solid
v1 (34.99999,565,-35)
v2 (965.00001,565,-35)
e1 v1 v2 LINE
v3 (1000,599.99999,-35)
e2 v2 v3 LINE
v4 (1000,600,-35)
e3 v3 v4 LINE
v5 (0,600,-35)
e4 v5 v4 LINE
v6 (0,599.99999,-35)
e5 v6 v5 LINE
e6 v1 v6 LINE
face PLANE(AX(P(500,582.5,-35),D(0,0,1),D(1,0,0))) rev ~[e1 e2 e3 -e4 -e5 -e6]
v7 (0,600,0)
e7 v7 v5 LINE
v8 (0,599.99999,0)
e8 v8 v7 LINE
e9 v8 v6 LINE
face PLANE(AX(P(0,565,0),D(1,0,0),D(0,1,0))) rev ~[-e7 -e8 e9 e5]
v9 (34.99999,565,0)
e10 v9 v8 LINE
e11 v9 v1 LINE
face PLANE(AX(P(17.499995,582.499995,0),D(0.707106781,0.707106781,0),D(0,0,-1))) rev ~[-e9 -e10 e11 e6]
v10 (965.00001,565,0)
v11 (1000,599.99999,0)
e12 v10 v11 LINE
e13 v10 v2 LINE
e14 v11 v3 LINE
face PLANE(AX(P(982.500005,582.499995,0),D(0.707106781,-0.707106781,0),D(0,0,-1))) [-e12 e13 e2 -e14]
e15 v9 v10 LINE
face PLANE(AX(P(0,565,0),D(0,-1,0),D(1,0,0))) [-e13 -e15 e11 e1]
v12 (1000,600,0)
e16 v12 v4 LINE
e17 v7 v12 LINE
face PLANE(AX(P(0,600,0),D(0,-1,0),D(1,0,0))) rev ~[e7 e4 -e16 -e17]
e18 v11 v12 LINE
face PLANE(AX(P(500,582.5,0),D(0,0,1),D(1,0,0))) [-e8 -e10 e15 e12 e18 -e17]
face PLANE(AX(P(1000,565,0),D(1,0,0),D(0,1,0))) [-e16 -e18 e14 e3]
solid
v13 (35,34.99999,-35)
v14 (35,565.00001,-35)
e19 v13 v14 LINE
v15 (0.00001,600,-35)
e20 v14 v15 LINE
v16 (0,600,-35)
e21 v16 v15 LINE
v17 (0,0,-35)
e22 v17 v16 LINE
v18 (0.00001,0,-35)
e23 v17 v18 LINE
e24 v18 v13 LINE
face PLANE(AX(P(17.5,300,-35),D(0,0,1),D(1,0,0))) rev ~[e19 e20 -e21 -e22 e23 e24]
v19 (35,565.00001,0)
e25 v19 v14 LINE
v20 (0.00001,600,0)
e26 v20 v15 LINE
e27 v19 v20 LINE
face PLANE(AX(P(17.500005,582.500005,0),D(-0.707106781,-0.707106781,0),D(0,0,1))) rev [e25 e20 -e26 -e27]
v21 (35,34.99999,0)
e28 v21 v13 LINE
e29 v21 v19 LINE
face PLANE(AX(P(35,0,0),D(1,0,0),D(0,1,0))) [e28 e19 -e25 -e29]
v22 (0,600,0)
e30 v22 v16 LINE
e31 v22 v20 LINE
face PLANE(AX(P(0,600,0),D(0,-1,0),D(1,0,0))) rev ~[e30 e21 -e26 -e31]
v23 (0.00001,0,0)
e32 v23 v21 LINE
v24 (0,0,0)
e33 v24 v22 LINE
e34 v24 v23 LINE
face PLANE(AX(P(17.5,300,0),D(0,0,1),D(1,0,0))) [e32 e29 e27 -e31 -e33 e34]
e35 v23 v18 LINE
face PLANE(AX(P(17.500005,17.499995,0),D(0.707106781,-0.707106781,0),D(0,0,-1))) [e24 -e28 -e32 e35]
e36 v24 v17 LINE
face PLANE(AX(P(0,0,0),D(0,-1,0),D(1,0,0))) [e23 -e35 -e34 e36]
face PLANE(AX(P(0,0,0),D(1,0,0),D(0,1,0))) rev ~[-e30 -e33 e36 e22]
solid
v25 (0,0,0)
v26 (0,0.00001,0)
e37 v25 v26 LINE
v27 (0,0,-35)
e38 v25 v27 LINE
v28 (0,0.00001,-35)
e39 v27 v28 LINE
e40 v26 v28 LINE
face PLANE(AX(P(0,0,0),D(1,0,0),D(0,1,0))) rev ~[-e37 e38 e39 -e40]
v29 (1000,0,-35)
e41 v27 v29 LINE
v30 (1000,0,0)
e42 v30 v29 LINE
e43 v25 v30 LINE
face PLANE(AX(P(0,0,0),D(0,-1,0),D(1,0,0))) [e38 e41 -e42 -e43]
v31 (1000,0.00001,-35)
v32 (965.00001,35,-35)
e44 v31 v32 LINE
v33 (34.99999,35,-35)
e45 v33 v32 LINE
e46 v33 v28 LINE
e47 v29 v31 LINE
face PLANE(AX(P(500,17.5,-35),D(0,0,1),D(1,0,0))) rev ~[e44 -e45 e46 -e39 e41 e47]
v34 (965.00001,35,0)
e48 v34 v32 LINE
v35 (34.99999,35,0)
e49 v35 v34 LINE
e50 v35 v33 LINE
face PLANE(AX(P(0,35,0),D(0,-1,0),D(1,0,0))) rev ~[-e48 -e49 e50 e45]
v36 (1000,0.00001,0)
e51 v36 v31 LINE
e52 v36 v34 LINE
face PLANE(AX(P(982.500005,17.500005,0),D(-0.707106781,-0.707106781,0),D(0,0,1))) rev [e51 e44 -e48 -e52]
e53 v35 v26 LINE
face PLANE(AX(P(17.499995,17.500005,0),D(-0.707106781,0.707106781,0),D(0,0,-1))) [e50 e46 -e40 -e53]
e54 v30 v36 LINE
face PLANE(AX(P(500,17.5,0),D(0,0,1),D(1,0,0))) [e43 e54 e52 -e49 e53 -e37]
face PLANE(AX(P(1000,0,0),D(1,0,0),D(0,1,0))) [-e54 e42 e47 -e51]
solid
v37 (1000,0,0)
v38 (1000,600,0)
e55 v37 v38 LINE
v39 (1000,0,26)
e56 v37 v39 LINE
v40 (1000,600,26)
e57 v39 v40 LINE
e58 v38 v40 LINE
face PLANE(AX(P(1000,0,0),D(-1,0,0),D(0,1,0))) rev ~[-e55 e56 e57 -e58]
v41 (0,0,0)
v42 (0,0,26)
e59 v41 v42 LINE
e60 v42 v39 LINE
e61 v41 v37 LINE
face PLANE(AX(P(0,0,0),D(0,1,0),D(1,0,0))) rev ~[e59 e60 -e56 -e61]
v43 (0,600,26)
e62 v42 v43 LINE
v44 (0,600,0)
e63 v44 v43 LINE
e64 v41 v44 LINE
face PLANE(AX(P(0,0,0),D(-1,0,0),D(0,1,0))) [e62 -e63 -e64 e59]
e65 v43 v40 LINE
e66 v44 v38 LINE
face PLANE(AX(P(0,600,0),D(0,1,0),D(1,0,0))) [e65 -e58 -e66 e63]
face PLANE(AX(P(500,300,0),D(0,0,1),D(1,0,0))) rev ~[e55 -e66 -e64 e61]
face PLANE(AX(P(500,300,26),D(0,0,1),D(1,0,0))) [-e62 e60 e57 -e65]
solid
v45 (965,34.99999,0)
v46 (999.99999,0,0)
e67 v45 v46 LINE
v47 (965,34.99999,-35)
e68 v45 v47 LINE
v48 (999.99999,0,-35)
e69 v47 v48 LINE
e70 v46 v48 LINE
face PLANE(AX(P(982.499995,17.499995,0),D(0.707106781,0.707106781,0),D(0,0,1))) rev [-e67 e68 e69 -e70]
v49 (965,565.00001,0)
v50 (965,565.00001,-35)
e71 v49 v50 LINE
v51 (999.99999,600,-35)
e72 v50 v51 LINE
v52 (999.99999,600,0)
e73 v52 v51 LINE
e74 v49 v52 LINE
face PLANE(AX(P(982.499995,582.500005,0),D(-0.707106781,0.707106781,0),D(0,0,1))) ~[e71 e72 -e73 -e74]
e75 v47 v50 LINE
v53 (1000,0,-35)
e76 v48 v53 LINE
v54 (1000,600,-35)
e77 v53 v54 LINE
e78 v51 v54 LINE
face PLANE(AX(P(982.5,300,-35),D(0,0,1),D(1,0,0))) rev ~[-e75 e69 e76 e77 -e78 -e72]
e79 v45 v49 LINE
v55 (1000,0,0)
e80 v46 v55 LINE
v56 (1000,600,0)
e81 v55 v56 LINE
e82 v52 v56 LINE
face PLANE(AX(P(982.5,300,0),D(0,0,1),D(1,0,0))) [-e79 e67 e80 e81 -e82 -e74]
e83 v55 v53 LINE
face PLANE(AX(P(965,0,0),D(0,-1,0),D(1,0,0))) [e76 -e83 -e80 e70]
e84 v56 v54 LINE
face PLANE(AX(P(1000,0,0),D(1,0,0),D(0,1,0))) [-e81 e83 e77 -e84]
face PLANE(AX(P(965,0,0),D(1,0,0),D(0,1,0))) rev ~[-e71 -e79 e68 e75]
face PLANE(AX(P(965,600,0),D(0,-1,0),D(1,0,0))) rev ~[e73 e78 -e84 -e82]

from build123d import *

# Parameters (mm, degrees)
F3_W       = 1000
F3_H       = 35
F7_DEPTH   = 35
F6_W       = 1000
F6_H       = 35
F8_DEPTH   = 35
F4_W       = 35
F4_H       = 600
F9_DEPTH   = 35
F5_W       = 35
F5_H       = 600
F10_DEPTH  = 35
F11_SIZE   = 34.99999
F12_SIZE   = 34.99999
F13_SIZE   = 34.99999
F14_SIZE   = 34.99999
F15_SIZE   = 34.99999
F15_2_SIZE = 34.99999
F16_SIZE   = 34.99999
F16_2_SIZE = 34.99999
F2_W       = 1000
F2_H       = 600
F17_DEPTH  = 26


# Not quite as in the source:
# - a fillet or chamfer is up to 0.001 mm smaller than in the source, because OpenCascade refuses the exact size


with BuildPart() as f7:
    # F3 (on Top) → F7 (new body)
    with BuildSketch(Plane.XY):
        with Locations((500, 17.5)):
            Rectangle(F3_W, F3_H)
    extrude(amount=-F7_DEPTH)

    # F14 (size 35 in the source; OpenCascade refuses exactly that, so slightly less here)
    f14_edges = [f7.edges().sort_by_distance(p)[0] for p in [
        (1000, 35, -17.5),
    ]]
    chamfer(f14_edges, length=F14_SIZE)

    # F15 (size 35 in the source; OpenCascade refuses exactly that, so slightly less here)
    f15_edges = [f7.edges().sort_by_distance(p)[0] for p in [
        (0, 35, -17.5),
    ]]
    chamfer(f15_edges, length=F15_SIZE)


with BuildPart() as f8:
    # F6 (on Top) → F8 (new body)
    with BuildSketch(Plane.XY):
        with Locations((500, 582.5)):
            Rectangle(F6_W, F6_H)
    extrude(amount=-F8_DEPTH)

    # F12 (size 35 in the source; OpenCascade refuses exactly that, so slightly less here)
    f12_edges = [f8.edges().sort_by_distance(p)[0] for p in [
        (1000, 565, -17.5),
    ]]
    chamfer(f12_edges, length=F12_SIZE)

    # F16#2 (size 35 in the source; OpenCascade refuses exactly that, so slightly less here)
    f16_2_edges = [f8.edges().sort_by_distance(p)[0] for p in [
        (0, 565, -17.5),
    ]]
    chamfer(f16_2_edges, length=F16_2_SIZE)


with BuildPart() as f9:
    # F4 (on Top) → F9 (new body)
    with BuildSketch(Plane.XY):
        with Locations((17.5, 300)):
            Rectangle(F4_W, F4_H)
    extrude(amount=-F9_DEPTH)

    # F15#2 (size 35 in the source; OpenCascade refuses exactly that, so slightly less here)
    f15_2_edges = [f9.edges().sort_by_distance(p)[0] for p in [
        (35, 0, -17.5),
    ]]
    chamfer(f15_2_edges, length=F15_2_SIZE)

    # F16 (size 35 in the source; OpenCascade refuses exactly that, so slightly less here)
    f16_edges = [f9.edges().sort_by_distance(p)[0] for p in [
        (35, 600, -17.5),
    ]]
    chamfer(f16_edges, length=F16_SIZE)


with BuildPart() as f10:
    # F5 (on Top) → F10 (new body)
    with BuildSketch(Plane.XY):
        with Locations((982.5, 300)):
            Rectangle(F5_W, F5_H)
    extrude(amount=-F10_DEPTH)

    # F11 (size 35 in the source; OpenCascade refuses exactly that, so slightly less here)
    f11_edges = [f10.edges().sort_by_distance(p)[0] for p in [
        (965, 600, -17.5),
    ]]
    chamfer(f11_edges, length=F11_SIZE)

    # F13 (size 35 in the source; OpenCascade refuses exactly that, so slightly less here)
    f13_edges = [f10.edges().sort_by_distance(p)[0] for p in [
        (965, 0, -17.5),
    ]]
    chamfer(f13_edges, length=F13_SIZE)


with BuildPart() as f17:
    # F2 (on Top) → F17 (new body)
    with BuildSketch(Plane.XY):
        with Locations((500, 300)):
            Rectangle(F2_W, F2_H)
    extrude(amount=F17_DEPTH)


solid = Compound([f7.part, f8.part, f9.part, f10.part, f17.part])
